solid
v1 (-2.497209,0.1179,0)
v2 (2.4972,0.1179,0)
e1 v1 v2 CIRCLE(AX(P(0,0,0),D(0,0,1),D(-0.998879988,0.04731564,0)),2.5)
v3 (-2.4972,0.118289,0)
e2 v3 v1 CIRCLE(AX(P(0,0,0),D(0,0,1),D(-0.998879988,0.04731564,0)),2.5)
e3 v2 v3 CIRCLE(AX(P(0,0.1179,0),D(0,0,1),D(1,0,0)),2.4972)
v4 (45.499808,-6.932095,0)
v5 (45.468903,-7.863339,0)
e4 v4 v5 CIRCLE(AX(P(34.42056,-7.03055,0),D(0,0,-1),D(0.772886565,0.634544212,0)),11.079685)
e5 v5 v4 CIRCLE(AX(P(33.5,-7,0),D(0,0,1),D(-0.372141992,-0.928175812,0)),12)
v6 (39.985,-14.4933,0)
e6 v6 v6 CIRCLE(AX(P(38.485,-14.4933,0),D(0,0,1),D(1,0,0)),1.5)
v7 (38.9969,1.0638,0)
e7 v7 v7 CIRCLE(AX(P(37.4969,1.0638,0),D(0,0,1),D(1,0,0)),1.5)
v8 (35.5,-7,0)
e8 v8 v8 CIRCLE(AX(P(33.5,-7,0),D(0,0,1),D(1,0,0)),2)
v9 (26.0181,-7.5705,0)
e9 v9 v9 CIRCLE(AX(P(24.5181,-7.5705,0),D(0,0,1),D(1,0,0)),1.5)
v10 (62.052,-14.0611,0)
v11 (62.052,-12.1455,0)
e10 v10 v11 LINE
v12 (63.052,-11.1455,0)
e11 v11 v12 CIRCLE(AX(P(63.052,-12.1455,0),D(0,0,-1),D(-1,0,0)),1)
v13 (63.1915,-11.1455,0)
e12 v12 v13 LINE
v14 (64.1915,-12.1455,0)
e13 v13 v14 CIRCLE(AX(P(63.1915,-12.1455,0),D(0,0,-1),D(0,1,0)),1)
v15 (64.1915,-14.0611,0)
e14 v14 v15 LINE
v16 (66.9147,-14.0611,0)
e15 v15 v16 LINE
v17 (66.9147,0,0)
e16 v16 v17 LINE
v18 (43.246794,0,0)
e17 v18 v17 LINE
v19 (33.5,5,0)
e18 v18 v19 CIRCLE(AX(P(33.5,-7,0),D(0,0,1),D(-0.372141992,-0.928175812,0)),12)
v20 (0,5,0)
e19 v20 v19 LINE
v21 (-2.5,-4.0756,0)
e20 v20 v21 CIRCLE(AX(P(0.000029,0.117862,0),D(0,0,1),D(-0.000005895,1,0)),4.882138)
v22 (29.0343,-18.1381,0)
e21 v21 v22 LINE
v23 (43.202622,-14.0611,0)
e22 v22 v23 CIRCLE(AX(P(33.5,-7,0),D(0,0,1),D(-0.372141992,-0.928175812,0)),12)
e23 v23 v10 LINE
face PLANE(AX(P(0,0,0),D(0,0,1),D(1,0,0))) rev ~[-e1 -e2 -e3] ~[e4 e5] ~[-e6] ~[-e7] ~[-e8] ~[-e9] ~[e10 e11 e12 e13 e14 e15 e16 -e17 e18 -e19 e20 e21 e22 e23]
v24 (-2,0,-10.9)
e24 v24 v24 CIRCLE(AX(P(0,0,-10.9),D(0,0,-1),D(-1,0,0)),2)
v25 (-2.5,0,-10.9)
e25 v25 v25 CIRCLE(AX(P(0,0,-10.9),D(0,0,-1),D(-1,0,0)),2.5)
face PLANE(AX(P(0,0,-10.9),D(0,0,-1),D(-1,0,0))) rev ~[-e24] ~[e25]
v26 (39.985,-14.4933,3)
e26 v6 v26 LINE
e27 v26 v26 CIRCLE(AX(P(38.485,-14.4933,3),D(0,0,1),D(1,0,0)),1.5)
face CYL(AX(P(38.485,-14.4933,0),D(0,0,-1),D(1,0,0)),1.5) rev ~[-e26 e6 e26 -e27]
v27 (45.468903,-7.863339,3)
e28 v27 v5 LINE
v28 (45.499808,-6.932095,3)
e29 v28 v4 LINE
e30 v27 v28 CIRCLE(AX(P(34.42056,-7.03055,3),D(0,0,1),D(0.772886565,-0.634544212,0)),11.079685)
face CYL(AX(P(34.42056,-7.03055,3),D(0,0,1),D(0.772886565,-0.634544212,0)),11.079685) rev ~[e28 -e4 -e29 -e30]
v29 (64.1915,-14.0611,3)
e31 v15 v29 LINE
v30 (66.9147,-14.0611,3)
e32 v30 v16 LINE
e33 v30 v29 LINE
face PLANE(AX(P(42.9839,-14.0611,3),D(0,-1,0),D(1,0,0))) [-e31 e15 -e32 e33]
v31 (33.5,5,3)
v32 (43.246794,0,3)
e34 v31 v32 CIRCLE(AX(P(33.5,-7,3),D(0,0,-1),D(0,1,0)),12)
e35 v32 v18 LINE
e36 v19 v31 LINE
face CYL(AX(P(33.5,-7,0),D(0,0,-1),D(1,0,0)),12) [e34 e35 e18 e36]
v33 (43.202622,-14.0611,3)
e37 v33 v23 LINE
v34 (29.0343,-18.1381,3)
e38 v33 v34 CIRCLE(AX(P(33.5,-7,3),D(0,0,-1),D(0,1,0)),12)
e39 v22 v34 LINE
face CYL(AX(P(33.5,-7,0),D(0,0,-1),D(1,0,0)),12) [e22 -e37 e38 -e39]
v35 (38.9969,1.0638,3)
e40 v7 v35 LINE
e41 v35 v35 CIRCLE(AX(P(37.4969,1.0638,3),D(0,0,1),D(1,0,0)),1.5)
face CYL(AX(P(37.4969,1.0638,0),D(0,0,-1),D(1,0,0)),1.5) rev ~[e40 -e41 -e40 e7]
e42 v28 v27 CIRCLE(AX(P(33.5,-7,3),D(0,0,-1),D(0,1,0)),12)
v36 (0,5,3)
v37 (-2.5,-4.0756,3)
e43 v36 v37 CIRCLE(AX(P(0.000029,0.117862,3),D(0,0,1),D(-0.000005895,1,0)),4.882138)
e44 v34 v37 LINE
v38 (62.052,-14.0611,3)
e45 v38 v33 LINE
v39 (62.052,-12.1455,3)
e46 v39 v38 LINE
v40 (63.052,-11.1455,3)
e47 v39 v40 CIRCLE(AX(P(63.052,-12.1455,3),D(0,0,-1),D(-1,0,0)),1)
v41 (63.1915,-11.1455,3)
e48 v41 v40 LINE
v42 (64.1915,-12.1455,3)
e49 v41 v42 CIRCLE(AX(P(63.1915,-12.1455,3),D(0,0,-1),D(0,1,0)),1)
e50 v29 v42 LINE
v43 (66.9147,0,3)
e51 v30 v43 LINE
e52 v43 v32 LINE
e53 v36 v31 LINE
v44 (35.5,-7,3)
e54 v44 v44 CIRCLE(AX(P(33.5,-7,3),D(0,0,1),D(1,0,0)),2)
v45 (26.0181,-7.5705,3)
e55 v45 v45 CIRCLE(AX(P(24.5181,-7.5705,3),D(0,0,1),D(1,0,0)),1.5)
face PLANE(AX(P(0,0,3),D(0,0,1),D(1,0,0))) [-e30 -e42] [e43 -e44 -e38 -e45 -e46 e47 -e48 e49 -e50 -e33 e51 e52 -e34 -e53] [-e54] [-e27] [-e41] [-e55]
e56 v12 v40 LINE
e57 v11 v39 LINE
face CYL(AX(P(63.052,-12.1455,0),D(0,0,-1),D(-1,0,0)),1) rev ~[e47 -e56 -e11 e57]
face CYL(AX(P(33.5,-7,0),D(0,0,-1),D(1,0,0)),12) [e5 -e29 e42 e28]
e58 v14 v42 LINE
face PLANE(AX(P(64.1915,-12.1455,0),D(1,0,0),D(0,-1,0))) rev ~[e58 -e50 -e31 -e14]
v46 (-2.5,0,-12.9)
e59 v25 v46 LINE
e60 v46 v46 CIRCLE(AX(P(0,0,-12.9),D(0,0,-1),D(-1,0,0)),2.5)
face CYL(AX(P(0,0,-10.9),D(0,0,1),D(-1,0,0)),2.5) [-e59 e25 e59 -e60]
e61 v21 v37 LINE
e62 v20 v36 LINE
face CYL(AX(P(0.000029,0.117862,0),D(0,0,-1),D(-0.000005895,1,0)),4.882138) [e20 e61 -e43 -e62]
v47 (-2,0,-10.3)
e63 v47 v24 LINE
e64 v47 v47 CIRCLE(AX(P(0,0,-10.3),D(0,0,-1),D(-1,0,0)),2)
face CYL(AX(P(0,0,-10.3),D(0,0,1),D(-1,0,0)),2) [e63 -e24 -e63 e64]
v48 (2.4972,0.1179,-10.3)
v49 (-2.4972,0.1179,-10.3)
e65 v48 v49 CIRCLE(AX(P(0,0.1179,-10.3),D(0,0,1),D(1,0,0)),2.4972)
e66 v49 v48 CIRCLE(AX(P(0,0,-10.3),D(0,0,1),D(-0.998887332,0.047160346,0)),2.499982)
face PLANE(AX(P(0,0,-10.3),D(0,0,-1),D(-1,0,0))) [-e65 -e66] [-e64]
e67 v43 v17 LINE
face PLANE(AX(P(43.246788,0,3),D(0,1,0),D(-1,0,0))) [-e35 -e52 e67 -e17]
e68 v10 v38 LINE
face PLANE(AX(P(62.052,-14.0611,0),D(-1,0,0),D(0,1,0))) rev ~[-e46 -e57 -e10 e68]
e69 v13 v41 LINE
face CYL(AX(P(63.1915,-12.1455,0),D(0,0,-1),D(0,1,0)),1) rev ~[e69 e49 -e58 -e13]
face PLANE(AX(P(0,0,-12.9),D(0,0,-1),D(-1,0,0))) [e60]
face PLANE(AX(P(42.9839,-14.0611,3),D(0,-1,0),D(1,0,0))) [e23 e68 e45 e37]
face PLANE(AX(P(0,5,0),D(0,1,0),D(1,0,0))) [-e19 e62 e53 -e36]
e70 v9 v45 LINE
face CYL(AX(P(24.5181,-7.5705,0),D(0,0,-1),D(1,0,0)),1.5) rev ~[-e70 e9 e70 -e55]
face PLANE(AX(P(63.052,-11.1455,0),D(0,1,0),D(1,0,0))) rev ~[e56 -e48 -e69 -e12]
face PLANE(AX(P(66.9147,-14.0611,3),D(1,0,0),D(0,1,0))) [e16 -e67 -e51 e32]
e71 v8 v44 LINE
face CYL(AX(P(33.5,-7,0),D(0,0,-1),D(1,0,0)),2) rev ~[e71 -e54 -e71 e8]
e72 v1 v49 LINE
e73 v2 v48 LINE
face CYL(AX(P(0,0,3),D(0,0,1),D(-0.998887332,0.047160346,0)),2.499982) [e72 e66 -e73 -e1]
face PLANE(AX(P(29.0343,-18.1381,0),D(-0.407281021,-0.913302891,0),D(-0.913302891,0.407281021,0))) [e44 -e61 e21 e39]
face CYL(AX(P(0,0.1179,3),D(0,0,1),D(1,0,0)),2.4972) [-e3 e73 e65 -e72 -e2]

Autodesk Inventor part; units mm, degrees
ref_plane "YZ Plane" through (0, 0, 0) normal (1, 0, 0) x (0, 1, 0)
ref_plane "XZ Plane" through (0, 0, 0) normal (0, 1, 0) x (-1, 0, 0)
ref_plane "XY Plane" through (0, 0, 0) normal (0, 0, 1) x (1, 0, 0)
sketch "Esquisse1" plane through (0, 0, 0) normal (0, 0, 1) x (1, 0, 0)
  circle A0 centre (0, 0) radius 2.5 projected
  circle A1 centre (33.5, -7) radius 12 projected
  circle A2 centre (33.5, -7) radius 2 projected
  circle A3 centre (38.485, -14.4933) radius 1.5 projected
  circle A4 centre (24.5181, -7.5705) radius 1.5 projected
  circle A5 centre (37.4969, 1.0638) radius 1.5 projected
  line L0 (0, 5) -> (33.5, 5)
  line L1 (29.0343, -18.1381) -> (-2.5, -4.0756)
  arc A6 (29.0343, -18.1381) -> (33.5, 5) centre (33.5, -7) ccw
  arc A7 (0, 5) -> (-2.5, -4.0756) centre (0, 0.1179) ccw
  circle A8 centre (0, 0.1179) radius 2.4972
  circle A9 centre (37.4969, 1.0638) radius 1.5
  circle A10 centre (24.5181, -7.5705) radius 1.5
  circle A11 centre (38.485, -14.4933) radius 1.5
extrude "Extrusion1" add sketch "Esquisse1" along normal blind 3 contours A1 L1 | A1 L1 A7 L0 picked at (27.6177, -3.3612)
sketch "Esquisse2" plane through (0, 0, 3) normal (0, 0, 1) x (1, 0, 0)
  point P0 (0, 0)
sketch "Esquisse3" plane through (0, 0, 3) normal (0, 0, 1) x (1, 0, 0)
  line L0 (42.9839, -14.0611) -> (66.9147, -14.0611)
  line L1 (66.9147, -14.0611) -> (66.9147, 0)
  line L2 (66.9147, 0) -> (42.9839, 0)
  circle A0 centre (33.5, -7) radius 2 projected
  circle A1 centre (37.4969, 1.0638) radius 1.5 projected
  circle A2 centre (24.5181, -7.5705) radius 1.5 projected
  circle A3 centre (38.485, -14.4933) radius 1.5 projected
  arc A4 (-2.4972, 0.1179) -> (2.4972, 0.1179) centre (0, 0) ccw projected
  arc A5 (2.4972, 0.1179) -> (-2.4972, 0.1179) centre (0, 0.1179) ccw projected
  arc A6 (0, 5) -> (-2.5, -4.0756) centre (0, 0.1179) ccw projected
  line L3 (-2.5, -4.0756) -> (29.0343, -18.1381) projected
  arc A7 (29.0343, -18.1381) -> (33.5, 5) centre (33.5, -7) ccw projected
  line L4 (33.5, 5) -> (0, 5) projected
  arc A8 (42.9839, -14.0611) -> (42.9839, 0) centre (34.4207, -7.0306) ccw
extrude "Extrusion2" add sketch "Esquisse3" against normal blind 3 contours A8 A7 L0 | A7 L2 L1 L0 | A8 L2 A7
sketch "Esquisse4" plane through (0, 0, 0) normal (0, 0, -1) x (-1, 0, 0)
  point P0 (0, 0)
sketch "Esquisse9" plane through (0, 0, 3) normal (0, 0, 1) x (1, 0, 0)
  arc A0 (-2.4972, 0.1179) -> (2.4972, 0.1179) centre (0, 0) ccw projected
  arc A1 (2.4972, 0.1179) -> (-2.4972, 0.1179) centre (0, 0.1179) ccw projected
extrude "Extrusion6" add sketch "Esquisse9" against normal blind 16
ref_plane "Plan de construction1" through (0, 0, -10.3) normal (0, 0, -1) x (-1, 0, 0)
sketch "Esquisse13" plane through (0, 0, -13) normal (0, 0, -1) x (-1, 0, 0)
  circle A0 centre (0, 0) radius 2.932
extrude "Extrusion8" cut sketch "Esquisse13" against normal up to surface (2.7 mm away)
sketch "Esquisse14" plane through (0, 0, -10.3) normal (0, 0, -1) x (-1, 0, 0)
  circle A0 centre (0, 0) radius 2
  dimension "d20" = 4
extrude "Extrusion9" add sketch "Esquisse14" along normal blind 0.6
sketch "Esquisse15" plane through (0, 0, -10.9) normal (0, 0, -1) x (-1, 0, 0)
  circle A0 centre (0, 0) radius 2.5
extrude "Extrusion10" add sketch "Esquisse15" along normal blind 2
sketch "Esquisse16" plane through (0, 0, 0) normal (0, 0, -1) x (-1, 0, 0)
  line L0 (-66.9147, -14.0611) -> (-43.2026, -14.0611) projected
  line L1 (-64.1915, -14.0611) -> (-62.052, -14.0611)
  line L2 (-62.052, -14.0611) -> (-62.052, -12.1455)
  line L3 (-63.052, -11.1455) -> (-63.1915, -11.1455)
  line L4 (-64.1915, -12.1455) -> (-64.1915, -14.0611)
  arc A0 (-62.052, -12.1455) -> (-63.052, -11.1455) centre (-63.052, -12.1455) ccw
  arc A1 (-63.1915, -11.1455) -> (-64.1915, -12.1455) centre (-63.1915, -12.1455) ccw
  point P0 (0, 0)
  dimension "d25" = 1
extrude "Extrusion11" cut sketch "Esquisse16" against normal blind 10
properties part number "bras-Codeur"
